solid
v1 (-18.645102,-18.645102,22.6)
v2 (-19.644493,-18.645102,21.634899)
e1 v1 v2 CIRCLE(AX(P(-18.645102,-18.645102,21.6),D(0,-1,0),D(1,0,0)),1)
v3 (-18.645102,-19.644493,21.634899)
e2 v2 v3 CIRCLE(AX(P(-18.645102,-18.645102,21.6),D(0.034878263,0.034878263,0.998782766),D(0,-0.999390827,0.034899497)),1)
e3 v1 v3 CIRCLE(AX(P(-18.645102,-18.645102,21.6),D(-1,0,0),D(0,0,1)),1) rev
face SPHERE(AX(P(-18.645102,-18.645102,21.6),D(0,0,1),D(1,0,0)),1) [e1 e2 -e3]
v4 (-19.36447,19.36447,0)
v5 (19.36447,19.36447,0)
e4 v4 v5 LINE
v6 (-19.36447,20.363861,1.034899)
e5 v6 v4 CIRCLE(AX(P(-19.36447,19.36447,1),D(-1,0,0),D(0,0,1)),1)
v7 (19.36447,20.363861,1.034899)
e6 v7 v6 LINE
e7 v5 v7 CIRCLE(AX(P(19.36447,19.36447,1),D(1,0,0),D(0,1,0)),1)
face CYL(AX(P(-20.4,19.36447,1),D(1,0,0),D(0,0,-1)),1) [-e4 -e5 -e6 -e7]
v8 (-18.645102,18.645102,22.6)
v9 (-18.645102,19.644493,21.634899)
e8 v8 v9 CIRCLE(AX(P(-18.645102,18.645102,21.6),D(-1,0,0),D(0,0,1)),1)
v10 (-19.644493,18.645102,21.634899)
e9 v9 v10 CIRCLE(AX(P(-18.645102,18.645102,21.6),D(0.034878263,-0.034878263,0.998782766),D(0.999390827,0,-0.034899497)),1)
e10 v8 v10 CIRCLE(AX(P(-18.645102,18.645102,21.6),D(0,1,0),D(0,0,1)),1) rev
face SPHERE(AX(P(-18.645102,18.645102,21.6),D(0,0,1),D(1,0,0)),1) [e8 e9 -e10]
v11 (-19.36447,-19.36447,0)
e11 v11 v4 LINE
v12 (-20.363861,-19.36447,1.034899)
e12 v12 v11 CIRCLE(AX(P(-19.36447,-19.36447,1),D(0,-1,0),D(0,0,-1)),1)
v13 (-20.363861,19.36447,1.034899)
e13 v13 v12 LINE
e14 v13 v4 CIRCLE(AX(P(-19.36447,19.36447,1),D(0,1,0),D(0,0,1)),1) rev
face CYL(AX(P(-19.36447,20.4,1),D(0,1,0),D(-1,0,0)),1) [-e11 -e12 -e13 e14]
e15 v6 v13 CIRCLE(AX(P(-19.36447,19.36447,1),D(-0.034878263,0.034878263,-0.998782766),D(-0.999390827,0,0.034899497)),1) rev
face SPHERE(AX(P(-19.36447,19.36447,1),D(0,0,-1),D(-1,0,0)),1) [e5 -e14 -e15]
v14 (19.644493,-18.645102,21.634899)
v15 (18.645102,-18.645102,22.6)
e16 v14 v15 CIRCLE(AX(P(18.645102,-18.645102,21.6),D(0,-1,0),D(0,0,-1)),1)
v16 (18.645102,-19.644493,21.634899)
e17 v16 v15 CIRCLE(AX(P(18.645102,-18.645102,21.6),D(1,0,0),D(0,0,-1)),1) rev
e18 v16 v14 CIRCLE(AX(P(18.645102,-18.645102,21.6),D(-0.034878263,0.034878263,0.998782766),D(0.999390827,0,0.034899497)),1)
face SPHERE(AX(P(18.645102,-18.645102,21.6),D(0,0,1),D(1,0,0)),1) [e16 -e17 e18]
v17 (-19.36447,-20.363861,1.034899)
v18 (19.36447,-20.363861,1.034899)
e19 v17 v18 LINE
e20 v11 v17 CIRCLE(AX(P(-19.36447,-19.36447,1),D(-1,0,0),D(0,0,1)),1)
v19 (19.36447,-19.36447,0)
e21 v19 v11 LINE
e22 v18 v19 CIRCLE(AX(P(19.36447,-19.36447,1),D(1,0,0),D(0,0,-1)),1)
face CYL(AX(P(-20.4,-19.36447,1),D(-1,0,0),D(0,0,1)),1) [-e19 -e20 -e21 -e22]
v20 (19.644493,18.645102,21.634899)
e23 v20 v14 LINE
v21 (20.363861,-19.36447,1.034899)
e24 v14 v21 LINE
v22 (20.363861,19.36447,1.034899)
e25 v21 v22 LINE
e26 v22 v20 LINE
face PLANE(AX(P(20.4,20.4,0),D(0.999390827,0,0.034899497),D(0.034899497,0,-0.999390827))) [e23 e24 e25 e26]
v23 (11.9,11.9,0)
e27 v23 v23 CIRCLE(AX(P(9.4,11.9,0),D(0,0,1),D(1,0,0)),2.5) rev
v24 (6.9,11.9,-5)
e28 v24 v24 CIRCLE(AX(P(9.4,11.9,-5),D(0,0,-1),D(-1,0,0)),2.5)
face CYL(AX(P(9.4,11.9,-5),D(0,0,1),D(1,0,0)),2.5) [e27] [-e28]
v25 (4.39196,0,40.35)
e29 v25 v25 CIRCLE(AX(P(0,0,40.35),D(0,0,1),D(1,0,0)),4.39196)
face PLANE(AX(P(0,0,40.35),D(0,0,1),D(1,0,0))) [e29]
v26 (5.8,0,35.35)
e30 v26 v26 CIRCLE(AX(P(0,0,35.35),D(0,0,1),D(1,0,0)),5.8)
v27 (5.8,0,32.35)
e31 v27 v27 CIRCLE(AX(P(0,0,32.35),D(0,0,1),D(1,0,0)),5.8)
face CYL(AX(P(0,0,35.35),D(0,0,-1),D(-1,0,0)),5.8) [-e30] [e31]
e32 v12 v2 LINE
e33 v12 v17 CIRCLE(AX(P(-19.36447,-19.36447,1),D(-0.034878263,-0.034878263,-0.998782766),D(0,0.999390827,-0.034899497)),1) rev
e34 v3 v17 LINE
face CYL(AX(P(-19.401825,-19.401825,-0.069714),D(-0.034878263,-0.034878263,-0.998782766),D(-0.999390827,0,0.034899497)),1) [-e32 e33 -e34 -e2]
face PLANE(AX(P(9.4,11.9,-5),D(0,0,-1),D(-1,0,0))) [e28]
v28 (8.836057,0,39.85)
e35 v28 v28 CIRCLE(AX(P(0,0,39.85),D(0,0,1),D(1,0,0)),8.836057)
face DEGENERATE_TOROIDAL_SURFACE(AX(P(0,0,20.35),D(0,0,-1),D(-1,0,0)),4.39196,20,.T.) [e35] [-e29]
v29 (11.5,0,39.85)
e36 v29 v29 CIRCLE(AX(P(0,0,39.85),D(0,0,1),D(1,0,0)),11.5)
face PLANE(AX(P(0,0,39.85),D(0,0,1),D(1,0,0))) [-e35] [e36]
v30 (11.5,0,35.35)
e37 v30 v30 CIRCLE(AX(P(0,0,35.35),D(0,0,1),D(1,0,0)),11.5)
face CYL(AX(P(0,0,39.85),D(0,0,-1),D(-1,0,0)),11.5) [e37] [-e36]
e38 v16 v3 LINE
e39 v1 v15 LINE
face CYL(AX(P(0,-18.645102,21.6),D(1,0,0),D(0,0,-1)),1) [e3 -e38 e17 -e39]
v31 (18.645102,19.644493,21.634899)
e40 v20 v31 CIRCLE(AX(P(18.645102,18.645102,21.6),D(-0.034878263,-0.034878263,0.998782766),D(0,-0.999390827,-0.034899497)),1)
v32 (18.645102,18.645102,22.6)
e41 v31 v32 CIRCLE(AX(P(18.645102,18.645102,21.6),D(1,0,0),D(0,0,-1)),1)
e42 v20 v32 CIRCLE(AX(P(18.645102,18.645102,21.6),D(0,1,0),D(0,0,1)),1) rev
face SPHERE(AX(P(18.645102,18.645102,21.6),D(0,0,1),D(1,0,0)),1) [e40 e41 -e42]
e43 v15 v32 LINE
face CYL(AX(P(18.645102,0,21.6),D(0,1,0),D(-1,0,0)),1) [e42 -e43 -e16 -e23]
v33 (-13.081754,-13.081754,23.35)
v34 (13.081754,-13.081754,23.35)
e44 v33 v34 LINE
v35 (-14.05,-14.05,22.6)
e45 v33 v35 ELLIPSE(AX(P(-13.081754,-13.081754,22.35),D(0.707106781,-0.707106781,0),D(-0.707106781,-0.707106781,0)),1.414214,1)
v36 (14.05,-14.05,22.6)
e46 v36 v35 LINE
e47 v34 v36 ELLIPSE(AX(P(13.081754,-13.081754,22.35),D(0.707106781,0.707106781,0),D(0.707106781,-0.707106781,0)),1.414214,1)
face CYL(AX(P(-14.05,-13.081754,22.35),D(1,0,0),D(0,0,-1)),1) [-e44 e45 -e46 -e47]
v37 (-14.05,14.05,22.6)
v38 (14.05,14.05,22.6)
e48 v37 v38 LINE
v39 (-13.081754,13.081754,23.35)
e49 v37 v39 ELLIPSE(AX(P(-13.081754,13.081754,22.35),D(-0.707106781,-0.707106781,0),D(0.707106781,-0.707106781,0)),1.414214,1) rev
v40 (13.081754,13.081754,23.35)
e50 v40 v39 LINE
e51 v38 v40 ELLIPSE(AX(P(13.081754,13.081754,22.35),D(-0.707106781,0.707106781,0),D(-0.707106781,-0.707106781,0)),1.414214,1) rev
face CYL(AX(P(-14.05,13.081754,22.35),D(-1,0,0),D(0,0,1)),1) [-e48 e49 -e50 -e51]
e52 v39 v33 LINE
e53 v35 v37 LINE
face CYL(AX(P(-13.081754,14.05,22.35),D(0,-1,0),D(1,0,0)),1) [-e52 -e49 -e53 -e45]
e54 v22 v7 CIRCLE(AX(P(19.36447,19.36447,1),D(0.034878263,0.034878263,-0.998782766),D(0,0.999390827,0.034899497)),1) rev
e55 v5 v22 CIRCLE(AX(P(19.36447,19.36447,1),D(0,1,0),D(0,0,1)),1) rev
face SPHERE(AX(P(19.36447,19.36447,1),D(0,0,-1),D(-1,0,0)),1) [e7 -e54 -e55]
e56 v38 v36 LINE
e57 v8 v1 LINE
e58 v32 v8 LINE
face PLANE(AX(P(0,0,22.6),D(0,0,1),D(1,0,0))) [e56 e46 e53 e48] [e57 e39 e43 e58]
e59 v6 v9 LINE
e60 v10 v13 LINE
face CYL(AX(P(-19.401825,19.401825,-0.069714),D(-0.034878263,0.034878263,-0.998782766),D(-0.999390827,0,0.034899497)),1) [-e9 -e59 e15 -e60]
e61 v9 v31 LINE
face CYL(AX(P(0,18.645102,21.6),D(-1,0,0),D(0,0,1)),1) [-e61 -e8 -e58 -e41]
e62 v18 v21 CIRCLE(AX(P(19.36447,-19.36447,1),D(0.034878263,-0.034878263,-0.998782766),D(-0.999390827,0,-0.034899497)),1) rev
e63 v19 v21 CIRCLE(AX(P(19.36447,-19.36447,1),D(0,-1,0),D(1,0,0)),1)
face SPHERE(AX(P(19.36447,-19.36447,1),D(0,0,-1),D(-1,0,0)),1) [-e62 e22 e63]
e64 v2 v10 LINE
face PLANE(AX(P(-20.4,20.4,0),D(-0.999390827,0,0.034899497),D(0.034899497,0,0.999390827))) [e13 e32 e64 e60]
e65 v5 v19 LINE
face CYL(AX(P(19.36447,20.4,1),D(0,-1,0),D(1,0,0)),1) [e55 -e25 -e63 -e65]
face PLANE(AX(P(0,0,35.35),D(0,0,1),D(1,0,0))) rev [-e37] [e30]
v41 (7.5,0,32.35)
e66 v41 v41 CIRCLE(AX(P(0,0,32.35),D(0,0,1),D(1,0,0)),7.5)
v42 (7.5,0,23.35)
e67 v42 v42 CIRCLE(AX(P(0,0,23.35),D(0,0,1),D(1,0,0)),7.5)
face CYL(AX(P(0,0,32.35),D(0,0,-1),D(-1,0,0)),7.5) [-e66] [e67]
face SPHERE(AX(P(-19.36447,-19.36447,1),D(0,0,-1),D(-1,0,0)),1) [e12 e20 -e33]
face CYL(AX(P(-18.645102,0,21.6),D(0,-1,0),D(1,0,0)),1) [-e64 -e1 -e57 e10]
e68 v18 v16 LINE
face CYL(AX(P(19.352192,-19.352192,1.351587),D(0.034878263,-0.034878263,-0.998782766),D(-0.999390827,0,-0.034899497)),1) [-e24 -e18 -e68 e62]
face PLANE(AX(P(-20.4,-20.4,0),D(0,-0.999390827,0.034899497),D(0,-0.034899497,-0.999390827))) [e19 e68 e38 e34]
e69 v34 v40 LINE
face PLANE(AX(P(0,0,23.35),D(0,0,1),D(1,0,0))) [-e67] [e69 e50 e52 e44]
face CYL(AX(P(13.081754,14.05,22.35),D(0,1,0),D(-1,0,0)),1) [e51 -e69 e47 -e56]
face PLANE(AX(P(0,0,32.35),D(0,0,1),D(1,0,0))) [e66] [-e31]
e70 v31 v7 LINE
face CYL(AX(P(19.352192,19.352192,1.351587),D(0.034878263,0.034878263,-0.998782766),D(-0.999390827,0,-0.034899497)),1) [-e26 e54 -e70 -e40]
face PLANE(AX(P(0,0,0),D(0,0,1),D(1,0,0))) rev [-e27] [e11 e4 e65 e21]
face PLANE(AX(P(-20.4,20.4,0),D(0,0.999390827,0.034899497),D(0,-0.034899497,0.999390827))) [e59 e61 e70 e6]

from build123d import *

# Parameters (mm, degrees)
CROQUIS1_W               = 40.8
CROQUIS1_H               = 40.8
SALIENTE_EXTRUIR1_DEPTH  = 22.6
SALIENTE_EXTRUIR1_TAPER  = 2
CROQUIS2_W               = 28.1
CROQUIS2_H               = 28.1
SALIENTE_EXTRUIR2_DEPTH  = 0.75
REDONDEO1_R              = 1
CROQUIS3_R               = 7.5
SALIENTE_EXTRUIR3_DEPTH  = 9
CROQUIS4_R               = 5.8
SALIENTE_EXTRUIR4_DEPTH  = 3
CROQUIS7_R               = 2.5
SALIENTE_EXTRUIR7_DEPTH  = 5
REDONDEO5_R              = 1
CROQUIS16_R              = 11.5
SALIENTE_EXTRUIR12_DEPTH = 4.5
CROQUIS17_R              = 8.836056804
SALIENTE_EXTRUIR13_DEPTH = 0.5
REDONDEO9_R              = 20


with BuildPart() as part:
    # Croquis1 → Saliente-Extruir1 (new body)
    with BuildSketch(Plane.XY):
        Rectangle(CROQUIS1_W, CROQUIS1_H)
    extrude(amount=SALIENTE_EXTRUIR1_DEPTH, taper=SALIENTE_EXTRUIR1_TAPER)

    # Croquis2 → Saliente-Extruir2 (add, symmetric)
    with BuildSketch(Plane.XY.offset(22.6)):
        Rectangle(CROQUIS2_W, CROQUIS2_H)
    extrude(amount=SALIENTE_EXTRUIR2_DEPTH, both=True)

    # Redondeo1
    # the kernel refuses this fillet: 1 mm, written as the material it takes off along each edge
    with BuildSketch(Plane(origin=(14.05, 16.470614591, 23.35), x_dir=(0, 0, -1), z_dir=(0, -1, 0)), Plane(origin=(-16.470614591, 14.05, 23.35), x_dir=(0, 0, -1), z_dir=(1, 0, 0)), Plane(origin=(16.470614591, -14.05, 23.35), x_dir=(0, 0, -1), z_dir=(-1, 0, 0)), Plane(origin=(-14.05, -16.470614591, 23.35), x_dir=(0, 0, -1), z_dir=(0, 1, 0))) as redondeo1_piece_1:
        with BuildLine():
            CenterArc((1, -0.968245837), REDONDEO1_R, 104.477512186, 75.522487814)
            Line((0, -0.968245837), (-0.02, -0.968245837))
            Line((-0.02, -0.968245837), (-0.02, 0))
            Line((-0.02, 0), (0, 0.02))
            ThreePointArc((0, 0.02), (0.375, 0.02), (0.745, 0.019364917))
            Line((0.745, 0.019364917), (0.75, 0))
        make_face()
    extrude(amount=32.941229183, mode=Mode.SUBTRACT)

    # Croquis3 → Saliente-Extruir3 (add)
    with BuildSketch(Plane.XY.offset(23.35)):
        Circle(CROQUIS3_R)
    extrude(amount=SALIENTE_EXTRUIR3_DEPTH)

    # Croquis4 → Saliente-Extruir4 (add)
    with BuildSketch(Plane.XY.offset(32.35)):
        Circle(CROQUIS4_R)
    extrude(amount=SALIENTE_EXTRUIR4_DEPTH)

    # Croquis7 → Saliente-Extruir7 (add)
    with BuildSketch(Plane(origin=(0, 0, 0), x_dir=(-1, 0, 0), z_dir=(0, 0, -1))):
        with Locations(Location((-9.4, 11.9, 0), (0, 0, 180))):
            Circle(CROQUIS7_R)
    extrude(amount=SALIENTE_EXTRUIR7_DEPTH)

    # Redondeo5
    redondeo5_edges = [part.edges().sort_by_distance(p)[0] for p in [
        (-19.610790609, 0, 22.6),
        (0, -19.610790609, 22.6),
        (19.610790609, 0, 22.6),
        (0, -20.4, 0),
        (-20.4, 0, 0),
        (0, 20.4, 0),
        (20.4, 0, 0),
        (20.005395305, -20.005395305, 11.3),
        (-20.005394843, -20.005394843, 11.300013228),
        (-20.005395305, 20.005395305, 11.3),
        (20.005394843, 20.005394843, 11.300013228),
        (0, 19.610790609, 22.6),
    ]]
    fillet(redondeo5_edges, radius=REDONDEO5_R)

    # Croquis16 → Saliente-Extruir12 (add)
    with BuildSketch(Plane.XY.offset(35.35)):
        Circle(CROQUIS16_R)
    extrude(amount=SALIENTE_EXTRUIR12_DEPTH)

    # Croquis17 → Saliente-Extruir13 (add)
    with BuildSketch(Plane.XY.offset(39.85)):
        Circle(CROQUIS17_R)
    extrude(amount=SALIENTE_EXTRUIR13_DEPTH)

    # Redondeo9
    # the kernel refuses this fillet: 20 mm, written as the material it takes off along each edge
    with BuildSketch(Plane(origin=(0, 0, 40.35), x_dir=(1, 0, 0), z_dir=(0, -1, 0))) as redondeo9_piece_1:
        with BuildLine():
            CenterArc((4.391959596, -20), REDONDEO9_R, 77.161431859, 12.838568141)
            Line((4.391959596, 0), (4.391959596, 0.4))
            Line((4.391959596, 0.4), (8.836056804, 0.4))
            Line((8.836056804, 0.4), (9.236056804, 0))
            ThreePointArc((9.236056804, 0), (9.236056804, -0.25), (8.924938748, -0.11))
            Line((8.924938748, -0.11), (8.836056804, -0.5))
        make_face()
    revolve(axis=Axis((0, 0, 40.35), (0, 0, 1)), mode=Mode.SUBTRACT)


solid = part.part
